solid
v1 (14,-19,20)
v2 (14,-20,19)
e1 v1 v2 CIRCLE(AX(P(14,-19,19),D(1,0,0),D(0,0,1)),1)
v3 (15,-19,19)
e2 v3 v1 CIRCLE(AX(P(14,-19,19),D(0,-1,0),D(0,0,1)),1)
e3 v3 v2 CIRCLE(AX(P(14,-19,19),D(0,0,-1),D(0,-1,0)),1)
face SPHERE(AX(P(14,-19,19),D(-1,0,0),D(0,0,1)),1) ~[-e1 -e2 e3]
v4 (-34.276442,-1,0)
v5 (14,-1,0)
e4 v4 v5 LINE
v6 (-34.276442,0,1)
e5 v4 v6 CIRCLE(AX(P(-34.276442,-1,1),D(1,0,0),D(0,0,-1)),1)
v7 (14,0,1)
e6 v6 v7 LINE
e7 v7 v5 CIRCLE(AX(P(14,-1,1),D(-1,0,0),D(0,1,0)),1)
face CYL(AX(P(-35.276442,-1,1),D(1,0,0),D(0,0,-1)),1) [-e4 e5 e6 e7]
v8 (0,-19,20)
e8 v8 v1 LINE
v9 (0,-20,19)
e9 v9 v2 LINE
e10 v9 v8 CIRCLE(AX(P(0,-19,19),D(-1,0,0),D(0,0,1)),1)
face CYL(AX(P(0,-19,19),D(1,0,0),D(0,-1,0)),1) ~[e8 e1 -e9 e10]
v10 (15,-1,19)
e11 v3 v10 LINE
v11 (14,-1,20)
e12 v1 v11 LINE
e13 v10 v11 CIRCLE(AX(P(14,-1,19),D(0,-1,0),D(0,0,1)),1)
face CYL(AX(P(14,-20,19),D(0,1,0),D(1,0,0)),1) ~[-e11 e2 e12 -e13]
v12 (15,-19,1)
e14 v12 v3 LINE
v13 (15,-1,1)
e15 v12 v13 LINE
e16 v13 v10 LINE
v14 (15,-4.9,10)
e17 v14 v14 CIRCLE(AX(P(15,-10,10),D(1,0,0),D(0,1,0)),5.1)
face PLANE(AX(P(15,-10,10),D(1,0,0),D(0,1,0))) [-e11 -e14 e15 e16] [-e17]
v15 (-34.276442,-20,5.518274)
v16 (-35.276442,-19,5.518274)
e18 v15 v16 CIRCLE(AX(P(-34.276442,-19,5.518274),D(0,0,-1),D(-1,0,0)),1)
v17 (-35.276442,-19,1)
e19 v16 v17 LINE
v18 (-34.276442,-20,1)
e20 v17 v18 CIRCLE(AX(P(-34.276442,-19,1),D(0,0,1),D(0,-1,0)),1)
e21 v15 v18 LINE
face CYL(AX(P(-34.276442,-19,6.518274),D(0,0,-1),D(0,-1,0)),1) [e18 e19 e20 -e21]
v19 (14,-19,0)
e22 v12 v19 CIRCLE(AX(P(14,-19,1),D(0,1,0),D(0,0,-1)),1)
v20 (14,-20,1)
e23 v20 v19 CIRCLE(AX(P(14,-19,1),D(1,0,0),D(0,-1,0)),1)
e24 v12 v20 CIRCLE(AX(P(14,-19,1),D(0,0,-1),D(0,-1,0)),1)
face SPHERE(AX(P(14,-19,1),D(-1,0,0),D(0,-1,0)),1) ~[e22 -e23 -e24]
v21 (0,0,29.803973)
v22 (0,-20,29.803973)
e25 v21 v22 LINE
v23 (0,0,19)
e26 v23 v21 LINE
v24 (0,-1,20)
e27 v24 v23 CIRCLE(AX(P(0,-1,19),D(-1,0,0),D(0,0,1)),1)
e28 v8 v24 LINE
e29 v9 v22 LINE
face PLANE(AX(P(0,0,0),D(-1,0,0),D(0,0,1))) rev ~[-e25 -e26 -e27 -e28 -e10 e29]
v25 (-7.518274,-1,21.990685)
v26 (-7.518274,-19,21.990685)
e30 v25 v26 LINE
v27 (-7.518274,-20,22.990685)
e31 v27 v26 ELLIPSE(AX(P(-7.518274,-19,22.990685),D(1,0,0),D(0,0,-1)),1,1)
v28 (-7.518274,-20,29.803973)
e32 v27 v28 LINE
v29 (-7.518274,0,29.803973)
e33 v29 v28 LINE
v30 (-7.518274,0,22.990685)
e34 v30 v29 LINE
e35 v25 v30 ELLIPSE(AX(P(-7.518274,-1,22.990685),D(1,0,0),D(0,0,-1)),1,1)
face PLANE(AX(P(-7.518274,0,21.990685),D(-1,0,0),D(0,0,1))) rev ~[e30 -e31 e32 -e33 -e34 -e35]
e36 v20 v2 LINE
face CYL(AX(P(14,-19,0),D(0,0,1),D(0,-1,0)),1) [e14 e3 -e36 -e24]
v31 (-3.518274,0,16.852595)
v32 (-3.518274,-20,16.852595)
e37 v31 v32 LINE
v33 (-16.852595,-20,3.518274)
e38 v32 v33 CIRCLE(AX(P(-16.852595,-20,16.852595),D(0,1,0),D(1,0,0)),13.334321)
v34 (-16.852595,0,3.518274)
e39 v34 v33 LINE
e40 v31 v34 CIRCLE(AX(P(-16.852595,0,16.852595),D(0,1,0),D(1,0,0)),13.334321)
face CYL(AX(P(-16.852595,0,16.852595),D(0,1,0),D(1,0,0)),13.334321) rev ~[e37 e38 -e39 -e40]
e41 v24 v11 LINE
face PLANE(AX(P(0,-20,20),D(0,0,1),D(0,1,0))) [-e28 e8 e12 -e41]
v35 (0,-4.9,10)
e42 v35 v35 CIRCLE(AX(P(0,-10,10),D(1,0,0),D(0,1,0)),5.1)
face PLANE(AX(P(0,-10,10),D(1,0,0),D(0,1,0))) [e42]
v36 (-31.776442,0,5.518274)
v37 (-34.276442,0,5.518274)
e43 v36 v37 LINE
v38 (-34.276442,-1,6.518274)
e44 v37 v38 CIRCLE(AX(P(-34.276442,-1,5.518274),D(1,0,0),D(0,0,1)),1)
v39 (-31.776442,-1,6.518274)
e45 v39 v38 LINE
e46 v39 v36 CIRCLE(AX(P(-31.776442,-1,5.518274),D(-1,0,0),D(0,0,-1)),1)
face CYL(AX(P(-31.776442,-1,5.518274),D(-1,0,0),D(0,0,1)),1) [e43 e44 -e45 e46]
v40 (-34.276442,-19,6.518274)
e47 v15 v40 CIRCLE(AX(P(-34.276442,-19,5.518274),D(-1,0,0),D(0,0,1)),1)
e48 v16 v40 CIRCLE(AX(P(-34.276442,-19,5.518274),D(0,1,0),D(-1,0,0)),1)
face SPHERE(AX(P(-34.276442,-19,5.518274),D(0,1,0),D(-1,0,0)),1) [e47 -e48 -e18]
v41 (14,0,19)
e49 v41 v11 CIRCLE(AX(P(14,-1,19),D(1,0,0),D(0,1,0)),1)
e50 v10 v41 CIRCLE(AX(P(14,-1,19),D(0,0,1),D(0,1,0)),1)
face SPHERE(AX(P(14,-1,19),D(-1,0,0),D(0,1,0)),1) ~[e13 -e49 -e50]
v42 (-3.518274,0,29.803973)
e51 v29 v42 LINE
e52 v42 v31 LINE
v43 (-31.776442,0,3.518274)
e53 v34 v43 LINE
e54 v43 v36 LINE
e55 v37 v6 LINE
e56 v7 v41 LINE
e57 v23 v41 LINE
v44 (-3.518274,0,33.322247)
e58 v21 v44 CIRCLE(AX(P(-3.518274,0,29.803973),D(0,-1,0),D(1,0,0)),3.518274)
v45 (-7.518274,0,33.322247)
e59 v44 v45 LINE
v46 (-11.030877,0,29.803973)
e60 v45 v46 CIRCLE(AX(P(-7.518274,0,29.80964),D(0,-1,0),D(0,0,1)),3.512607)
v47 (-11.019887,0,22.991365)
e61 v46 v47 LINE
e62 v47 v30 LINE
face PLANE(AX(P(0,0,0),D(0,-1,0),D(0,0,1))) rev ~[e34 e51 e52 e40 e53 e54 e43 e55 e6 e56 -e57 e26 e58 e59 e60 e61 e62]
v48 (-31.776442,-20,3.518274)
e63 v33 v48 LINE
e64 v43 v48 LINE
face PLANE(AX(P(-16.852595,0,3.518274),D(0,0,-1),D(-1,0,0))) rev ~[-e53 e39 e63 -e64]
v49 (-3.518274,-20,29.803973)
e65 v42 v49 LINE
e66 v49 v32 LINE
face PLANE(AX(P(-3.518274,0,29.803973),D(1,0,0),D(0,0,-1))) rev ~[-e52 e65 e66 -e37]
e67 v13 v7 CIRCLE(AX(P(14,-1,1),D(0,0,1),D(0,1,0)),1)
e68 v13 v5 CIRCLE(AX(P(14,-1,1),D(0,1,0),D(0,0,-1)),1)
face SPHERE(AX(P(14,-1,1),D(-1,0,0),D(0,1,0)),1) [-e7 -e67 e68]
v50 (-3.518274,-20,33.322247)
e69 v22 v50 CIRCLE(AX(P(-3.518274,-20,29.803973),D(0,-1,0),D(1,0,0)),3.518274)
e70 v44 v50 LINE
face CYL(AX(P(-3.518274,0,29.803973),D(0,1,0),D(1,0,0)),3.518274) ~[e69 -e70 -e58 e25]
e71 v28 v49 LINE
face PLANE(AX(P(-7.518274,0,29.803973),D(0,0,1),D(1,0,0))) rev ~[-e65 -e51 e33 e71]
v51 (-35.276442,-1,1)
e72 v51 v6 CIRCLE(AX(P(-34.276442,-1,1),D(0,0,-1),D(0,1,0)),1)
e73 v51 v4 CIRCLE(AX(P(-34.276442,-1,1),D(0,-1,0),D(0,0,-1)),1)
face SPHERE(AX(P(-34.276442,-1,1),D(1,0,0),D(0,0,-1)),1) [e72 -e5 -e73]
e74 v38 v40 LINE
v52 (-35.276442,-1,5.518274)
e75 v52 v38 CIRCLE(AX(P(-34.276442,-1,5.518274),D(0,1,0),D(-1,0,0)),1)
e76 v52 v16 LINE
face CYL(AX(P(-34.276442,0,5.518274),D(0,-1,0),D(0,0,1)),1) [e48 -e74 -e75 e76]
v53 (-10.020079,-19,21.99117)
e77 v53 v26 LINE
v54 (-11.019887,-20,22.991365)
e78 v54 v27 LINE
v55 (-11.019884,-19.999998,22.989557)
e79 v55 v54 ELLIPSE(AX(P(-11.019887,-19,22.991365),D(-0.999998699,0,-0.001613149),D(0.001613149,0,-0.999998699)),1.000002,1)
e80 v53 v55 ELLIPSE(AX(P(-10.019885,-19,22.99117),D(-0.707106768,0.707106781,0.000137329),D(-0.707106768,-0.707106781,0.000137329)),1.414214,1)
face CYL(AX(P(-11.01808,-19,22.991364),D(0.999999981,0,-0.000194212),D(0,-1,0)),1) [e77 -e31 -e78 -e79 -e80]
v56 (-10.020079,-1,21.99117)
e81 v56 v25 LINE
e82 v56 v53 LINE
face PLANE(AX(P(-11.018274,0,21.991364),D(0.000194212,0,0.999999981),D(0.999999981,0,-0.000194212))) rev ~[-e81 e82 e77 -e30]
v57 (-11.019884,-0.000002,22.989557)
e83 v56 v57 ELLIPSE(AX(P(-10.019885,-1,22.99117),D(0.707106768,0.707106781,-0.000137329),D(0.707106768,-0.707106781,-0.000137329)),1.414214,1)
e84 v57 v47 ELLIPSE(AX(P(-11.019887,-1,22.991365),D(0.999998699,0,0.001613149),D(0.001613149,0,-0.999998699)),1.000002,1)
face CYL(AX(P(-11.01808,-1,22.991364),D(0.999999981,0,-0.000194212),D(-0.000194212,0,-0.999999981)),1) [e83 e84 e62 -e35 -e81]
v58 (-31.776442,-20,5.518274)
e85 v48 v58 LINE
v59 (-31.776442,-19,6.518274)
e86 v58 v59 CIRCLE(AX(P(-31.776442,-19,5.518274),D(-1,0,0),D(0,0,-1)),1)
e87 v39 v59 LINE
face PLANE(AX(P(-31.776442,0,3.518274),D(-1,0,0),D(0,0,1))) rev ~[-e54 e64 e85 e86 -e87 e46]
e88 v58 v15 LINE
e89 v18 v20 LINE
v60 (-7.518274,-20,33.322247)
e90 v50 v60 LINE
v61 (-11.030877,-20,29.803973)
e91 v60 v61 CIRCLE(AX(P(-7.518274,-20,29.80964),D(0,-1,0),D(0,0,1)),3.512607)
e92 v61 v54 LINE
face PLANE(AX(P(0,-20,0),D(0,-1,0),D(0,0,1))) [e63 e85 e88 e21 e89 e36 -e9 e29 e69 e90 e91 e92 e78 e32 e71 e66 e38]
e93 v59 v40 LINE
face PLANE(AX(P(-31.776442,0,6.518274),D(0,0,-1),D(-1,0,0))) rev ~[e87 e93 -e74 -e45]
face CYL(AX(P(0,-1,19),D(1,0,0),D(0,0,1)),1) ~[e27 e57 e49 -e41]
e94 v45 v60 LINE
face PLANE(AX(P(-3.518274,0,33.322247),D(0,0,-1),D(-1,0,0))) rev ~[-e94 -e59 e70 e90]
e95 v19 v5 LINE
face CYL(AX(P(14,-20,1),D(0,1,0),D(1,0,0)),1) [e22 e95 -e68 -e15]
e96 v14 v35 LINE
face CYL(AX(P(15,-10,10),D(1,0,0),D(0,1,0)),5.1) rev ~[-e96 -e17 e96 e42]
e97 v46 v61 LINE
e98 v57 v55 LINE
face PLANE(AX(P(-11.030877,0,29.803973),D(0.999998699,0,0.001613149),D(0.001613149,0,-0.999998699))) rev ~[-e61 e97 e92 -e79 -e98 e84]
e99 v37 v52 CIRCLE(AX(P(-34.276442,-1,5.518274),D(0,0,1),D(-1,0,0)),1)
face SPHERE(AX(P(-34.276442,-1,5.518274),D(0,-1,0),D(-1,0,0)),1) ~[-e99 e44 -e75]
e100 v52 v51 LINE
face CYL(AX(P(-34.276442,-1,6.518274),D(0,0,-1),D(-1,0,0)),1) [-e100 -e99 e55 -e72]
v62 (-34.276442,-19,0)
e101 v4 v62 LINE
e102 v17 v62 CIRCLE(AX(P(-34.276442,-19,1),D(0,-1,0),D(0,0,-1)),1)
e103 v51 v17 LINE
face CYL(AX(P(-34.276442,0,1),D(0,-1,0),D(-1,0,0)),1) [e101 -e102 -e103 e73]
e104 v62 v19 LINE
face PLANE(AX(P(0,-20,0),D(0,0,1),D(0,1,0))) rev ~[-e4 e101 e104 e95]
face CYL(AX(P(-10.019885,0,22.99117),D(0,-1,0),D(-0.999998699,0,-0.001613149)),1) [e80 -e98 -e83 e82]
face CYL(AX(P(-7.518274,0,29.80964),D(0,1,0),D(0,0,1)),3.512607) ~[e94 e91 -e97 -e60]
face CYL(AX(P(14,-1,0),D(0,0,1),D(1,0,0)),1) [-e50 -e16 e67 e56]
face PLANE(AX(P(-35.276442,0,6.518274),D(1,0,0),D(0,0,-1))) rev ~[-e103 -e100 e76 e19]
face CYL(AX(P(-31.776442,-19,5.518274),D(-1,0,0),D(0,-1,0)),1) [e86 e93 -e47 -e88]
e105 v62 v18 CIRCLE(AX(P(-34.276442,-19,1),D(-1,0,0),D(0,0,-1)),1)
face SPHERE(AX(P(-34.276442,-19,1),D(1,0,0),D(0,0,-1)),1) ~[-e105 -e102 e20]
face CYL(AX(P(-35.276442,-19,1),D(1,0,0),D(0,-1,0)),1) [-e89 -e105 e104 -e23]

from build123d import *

# Parameters (mm, degrees)
F1_DEPTH = 20
F2_DEPTH = 20
F3_W     = 20
F3_H     = 20
F4_DEPTH = 15
F5_R     = 5.1
F6_DEPTH = 15
F7_R     = 1


# Not quite as in the source:
# - a feature names something its author has since deleted; it is built from what else it names


with BuildPart() as f1:
    # F0 (on Front) → F1 (new body)
    with BuildSketch(Plane.XZ):
        with BuildLine():
            Line((-11.0182737141, 21.9913642435), (-7.5182737801, 21.9906845019))
            Line((-7.5182737801, 21.9906845019), (-7.5182737801, 29.8039734362))
            Line((-7.5182737801, 29.8039734362), (-3.5182737801, 29.8039734362))
            Line((-3.5182737801, 29.8039734362), (-3.5182737801, 16.8525947745))
            ThreePointArc((-3.5182737801, 16.8525947745), (-7.4238059768, 7.4238059768), (-16.8525947745, 3.5182737801))
            Line((-16.8525947745, 3.5182737801), (-31.7764421987, 3.5182737801))
            Line((-31.7764421987, 3.5182737801), (-31.7764421987, 6.5182737801))
            Line((-31.7764421987, 6.5182737801), (-35.2764421987, 6.5182737801))
            Line((-35.2764421987, 6.5182737801), (-35.2764421987, 0))
            Line((-35.2764421987, 0), (-16.8525947745, 0))
            ThreePointArc((-16.8525947745, 0), (-4.9360107289, 4.9360107289), (0, 16.8525947745))
            Line((0, 16.8525947745), (0, 29.8039734362))
            ThreePointArc((0, 29.8039734362), (-1.0304785321, 32.2917686842), (-3.5182737801, 33.3222472163))
            Line((-3.5182737801, 33.3222472163), (-7.5182737801, 33.3222472163))
            ThreePointArc((-7.5182737801, 33.3222472163), (-10.0040648606, 32.2914241533), (-11.0308766315, 29.8039734362))
            Line((-11.0308766315, 29.8039734362), (-11.0182737141, 21.9913642435))
        make_face()
    extrude(amount=F1_DEPTH)

    # F0 (on Front) → F2 (join)
    with BuildSketch(Plane.XZ):
        with BuildLine():
            Line((0, 0), (0, 16.8525947745))
            ThreePointArc((0, 16.8525947745), (-4.9360107289, 4.9360107289), (-16.8525947745, 0))
            Line((-16.8525947745, 0), (0, 0))
        make_face()
    extrude(amount=F2_DEPTH)

    # F3 (on face) → F4 (join)
    with BuildSketch(Plane.YZ):
        with Locations((-10, 10)):
            Rectangle(F3_W, F3_H)
    extrude(amount=F4_DEPTH)

    # F5 (on face) → F6 (cut)
    with BuildSketch(Plane.YZ.offset(15)):
        with Locations((-10, 10)):
            Circle(F5_R)
    extrude(amount=-F6_DEPTH, mode=Mode.SUBTRACT)

    # F7
    f7_edges = [f1.edges().sort_by_distance(p)[0] for p in [
        (-10.138221, -20, 0),
        (-10.138221, 0, 0),
        (-35.276442, -10, 0),
        (-35.276442, -10, 6.518274),
        (-35.276442, 0, 3.259137),
        (-35.276442, -20, 3.259137),
        (-33.526442, -20, 6.518274),
        (-33.526442, 0, 6.518274),
        (-9.268274, 0, 21.991024),
        (-9.268274, -20, 21.991024),
        (-11.018274, -10, 21.991364),
        (7.5, 0, 20),
        (7.5, -20, 20),
        (15, 0, 10),
        (15, -10, 20),
        (15, -20, 10),
        (15, -10, 0),
    ]]
    fillet(f7_edges, radius=F7_R)


solid = f1.part
